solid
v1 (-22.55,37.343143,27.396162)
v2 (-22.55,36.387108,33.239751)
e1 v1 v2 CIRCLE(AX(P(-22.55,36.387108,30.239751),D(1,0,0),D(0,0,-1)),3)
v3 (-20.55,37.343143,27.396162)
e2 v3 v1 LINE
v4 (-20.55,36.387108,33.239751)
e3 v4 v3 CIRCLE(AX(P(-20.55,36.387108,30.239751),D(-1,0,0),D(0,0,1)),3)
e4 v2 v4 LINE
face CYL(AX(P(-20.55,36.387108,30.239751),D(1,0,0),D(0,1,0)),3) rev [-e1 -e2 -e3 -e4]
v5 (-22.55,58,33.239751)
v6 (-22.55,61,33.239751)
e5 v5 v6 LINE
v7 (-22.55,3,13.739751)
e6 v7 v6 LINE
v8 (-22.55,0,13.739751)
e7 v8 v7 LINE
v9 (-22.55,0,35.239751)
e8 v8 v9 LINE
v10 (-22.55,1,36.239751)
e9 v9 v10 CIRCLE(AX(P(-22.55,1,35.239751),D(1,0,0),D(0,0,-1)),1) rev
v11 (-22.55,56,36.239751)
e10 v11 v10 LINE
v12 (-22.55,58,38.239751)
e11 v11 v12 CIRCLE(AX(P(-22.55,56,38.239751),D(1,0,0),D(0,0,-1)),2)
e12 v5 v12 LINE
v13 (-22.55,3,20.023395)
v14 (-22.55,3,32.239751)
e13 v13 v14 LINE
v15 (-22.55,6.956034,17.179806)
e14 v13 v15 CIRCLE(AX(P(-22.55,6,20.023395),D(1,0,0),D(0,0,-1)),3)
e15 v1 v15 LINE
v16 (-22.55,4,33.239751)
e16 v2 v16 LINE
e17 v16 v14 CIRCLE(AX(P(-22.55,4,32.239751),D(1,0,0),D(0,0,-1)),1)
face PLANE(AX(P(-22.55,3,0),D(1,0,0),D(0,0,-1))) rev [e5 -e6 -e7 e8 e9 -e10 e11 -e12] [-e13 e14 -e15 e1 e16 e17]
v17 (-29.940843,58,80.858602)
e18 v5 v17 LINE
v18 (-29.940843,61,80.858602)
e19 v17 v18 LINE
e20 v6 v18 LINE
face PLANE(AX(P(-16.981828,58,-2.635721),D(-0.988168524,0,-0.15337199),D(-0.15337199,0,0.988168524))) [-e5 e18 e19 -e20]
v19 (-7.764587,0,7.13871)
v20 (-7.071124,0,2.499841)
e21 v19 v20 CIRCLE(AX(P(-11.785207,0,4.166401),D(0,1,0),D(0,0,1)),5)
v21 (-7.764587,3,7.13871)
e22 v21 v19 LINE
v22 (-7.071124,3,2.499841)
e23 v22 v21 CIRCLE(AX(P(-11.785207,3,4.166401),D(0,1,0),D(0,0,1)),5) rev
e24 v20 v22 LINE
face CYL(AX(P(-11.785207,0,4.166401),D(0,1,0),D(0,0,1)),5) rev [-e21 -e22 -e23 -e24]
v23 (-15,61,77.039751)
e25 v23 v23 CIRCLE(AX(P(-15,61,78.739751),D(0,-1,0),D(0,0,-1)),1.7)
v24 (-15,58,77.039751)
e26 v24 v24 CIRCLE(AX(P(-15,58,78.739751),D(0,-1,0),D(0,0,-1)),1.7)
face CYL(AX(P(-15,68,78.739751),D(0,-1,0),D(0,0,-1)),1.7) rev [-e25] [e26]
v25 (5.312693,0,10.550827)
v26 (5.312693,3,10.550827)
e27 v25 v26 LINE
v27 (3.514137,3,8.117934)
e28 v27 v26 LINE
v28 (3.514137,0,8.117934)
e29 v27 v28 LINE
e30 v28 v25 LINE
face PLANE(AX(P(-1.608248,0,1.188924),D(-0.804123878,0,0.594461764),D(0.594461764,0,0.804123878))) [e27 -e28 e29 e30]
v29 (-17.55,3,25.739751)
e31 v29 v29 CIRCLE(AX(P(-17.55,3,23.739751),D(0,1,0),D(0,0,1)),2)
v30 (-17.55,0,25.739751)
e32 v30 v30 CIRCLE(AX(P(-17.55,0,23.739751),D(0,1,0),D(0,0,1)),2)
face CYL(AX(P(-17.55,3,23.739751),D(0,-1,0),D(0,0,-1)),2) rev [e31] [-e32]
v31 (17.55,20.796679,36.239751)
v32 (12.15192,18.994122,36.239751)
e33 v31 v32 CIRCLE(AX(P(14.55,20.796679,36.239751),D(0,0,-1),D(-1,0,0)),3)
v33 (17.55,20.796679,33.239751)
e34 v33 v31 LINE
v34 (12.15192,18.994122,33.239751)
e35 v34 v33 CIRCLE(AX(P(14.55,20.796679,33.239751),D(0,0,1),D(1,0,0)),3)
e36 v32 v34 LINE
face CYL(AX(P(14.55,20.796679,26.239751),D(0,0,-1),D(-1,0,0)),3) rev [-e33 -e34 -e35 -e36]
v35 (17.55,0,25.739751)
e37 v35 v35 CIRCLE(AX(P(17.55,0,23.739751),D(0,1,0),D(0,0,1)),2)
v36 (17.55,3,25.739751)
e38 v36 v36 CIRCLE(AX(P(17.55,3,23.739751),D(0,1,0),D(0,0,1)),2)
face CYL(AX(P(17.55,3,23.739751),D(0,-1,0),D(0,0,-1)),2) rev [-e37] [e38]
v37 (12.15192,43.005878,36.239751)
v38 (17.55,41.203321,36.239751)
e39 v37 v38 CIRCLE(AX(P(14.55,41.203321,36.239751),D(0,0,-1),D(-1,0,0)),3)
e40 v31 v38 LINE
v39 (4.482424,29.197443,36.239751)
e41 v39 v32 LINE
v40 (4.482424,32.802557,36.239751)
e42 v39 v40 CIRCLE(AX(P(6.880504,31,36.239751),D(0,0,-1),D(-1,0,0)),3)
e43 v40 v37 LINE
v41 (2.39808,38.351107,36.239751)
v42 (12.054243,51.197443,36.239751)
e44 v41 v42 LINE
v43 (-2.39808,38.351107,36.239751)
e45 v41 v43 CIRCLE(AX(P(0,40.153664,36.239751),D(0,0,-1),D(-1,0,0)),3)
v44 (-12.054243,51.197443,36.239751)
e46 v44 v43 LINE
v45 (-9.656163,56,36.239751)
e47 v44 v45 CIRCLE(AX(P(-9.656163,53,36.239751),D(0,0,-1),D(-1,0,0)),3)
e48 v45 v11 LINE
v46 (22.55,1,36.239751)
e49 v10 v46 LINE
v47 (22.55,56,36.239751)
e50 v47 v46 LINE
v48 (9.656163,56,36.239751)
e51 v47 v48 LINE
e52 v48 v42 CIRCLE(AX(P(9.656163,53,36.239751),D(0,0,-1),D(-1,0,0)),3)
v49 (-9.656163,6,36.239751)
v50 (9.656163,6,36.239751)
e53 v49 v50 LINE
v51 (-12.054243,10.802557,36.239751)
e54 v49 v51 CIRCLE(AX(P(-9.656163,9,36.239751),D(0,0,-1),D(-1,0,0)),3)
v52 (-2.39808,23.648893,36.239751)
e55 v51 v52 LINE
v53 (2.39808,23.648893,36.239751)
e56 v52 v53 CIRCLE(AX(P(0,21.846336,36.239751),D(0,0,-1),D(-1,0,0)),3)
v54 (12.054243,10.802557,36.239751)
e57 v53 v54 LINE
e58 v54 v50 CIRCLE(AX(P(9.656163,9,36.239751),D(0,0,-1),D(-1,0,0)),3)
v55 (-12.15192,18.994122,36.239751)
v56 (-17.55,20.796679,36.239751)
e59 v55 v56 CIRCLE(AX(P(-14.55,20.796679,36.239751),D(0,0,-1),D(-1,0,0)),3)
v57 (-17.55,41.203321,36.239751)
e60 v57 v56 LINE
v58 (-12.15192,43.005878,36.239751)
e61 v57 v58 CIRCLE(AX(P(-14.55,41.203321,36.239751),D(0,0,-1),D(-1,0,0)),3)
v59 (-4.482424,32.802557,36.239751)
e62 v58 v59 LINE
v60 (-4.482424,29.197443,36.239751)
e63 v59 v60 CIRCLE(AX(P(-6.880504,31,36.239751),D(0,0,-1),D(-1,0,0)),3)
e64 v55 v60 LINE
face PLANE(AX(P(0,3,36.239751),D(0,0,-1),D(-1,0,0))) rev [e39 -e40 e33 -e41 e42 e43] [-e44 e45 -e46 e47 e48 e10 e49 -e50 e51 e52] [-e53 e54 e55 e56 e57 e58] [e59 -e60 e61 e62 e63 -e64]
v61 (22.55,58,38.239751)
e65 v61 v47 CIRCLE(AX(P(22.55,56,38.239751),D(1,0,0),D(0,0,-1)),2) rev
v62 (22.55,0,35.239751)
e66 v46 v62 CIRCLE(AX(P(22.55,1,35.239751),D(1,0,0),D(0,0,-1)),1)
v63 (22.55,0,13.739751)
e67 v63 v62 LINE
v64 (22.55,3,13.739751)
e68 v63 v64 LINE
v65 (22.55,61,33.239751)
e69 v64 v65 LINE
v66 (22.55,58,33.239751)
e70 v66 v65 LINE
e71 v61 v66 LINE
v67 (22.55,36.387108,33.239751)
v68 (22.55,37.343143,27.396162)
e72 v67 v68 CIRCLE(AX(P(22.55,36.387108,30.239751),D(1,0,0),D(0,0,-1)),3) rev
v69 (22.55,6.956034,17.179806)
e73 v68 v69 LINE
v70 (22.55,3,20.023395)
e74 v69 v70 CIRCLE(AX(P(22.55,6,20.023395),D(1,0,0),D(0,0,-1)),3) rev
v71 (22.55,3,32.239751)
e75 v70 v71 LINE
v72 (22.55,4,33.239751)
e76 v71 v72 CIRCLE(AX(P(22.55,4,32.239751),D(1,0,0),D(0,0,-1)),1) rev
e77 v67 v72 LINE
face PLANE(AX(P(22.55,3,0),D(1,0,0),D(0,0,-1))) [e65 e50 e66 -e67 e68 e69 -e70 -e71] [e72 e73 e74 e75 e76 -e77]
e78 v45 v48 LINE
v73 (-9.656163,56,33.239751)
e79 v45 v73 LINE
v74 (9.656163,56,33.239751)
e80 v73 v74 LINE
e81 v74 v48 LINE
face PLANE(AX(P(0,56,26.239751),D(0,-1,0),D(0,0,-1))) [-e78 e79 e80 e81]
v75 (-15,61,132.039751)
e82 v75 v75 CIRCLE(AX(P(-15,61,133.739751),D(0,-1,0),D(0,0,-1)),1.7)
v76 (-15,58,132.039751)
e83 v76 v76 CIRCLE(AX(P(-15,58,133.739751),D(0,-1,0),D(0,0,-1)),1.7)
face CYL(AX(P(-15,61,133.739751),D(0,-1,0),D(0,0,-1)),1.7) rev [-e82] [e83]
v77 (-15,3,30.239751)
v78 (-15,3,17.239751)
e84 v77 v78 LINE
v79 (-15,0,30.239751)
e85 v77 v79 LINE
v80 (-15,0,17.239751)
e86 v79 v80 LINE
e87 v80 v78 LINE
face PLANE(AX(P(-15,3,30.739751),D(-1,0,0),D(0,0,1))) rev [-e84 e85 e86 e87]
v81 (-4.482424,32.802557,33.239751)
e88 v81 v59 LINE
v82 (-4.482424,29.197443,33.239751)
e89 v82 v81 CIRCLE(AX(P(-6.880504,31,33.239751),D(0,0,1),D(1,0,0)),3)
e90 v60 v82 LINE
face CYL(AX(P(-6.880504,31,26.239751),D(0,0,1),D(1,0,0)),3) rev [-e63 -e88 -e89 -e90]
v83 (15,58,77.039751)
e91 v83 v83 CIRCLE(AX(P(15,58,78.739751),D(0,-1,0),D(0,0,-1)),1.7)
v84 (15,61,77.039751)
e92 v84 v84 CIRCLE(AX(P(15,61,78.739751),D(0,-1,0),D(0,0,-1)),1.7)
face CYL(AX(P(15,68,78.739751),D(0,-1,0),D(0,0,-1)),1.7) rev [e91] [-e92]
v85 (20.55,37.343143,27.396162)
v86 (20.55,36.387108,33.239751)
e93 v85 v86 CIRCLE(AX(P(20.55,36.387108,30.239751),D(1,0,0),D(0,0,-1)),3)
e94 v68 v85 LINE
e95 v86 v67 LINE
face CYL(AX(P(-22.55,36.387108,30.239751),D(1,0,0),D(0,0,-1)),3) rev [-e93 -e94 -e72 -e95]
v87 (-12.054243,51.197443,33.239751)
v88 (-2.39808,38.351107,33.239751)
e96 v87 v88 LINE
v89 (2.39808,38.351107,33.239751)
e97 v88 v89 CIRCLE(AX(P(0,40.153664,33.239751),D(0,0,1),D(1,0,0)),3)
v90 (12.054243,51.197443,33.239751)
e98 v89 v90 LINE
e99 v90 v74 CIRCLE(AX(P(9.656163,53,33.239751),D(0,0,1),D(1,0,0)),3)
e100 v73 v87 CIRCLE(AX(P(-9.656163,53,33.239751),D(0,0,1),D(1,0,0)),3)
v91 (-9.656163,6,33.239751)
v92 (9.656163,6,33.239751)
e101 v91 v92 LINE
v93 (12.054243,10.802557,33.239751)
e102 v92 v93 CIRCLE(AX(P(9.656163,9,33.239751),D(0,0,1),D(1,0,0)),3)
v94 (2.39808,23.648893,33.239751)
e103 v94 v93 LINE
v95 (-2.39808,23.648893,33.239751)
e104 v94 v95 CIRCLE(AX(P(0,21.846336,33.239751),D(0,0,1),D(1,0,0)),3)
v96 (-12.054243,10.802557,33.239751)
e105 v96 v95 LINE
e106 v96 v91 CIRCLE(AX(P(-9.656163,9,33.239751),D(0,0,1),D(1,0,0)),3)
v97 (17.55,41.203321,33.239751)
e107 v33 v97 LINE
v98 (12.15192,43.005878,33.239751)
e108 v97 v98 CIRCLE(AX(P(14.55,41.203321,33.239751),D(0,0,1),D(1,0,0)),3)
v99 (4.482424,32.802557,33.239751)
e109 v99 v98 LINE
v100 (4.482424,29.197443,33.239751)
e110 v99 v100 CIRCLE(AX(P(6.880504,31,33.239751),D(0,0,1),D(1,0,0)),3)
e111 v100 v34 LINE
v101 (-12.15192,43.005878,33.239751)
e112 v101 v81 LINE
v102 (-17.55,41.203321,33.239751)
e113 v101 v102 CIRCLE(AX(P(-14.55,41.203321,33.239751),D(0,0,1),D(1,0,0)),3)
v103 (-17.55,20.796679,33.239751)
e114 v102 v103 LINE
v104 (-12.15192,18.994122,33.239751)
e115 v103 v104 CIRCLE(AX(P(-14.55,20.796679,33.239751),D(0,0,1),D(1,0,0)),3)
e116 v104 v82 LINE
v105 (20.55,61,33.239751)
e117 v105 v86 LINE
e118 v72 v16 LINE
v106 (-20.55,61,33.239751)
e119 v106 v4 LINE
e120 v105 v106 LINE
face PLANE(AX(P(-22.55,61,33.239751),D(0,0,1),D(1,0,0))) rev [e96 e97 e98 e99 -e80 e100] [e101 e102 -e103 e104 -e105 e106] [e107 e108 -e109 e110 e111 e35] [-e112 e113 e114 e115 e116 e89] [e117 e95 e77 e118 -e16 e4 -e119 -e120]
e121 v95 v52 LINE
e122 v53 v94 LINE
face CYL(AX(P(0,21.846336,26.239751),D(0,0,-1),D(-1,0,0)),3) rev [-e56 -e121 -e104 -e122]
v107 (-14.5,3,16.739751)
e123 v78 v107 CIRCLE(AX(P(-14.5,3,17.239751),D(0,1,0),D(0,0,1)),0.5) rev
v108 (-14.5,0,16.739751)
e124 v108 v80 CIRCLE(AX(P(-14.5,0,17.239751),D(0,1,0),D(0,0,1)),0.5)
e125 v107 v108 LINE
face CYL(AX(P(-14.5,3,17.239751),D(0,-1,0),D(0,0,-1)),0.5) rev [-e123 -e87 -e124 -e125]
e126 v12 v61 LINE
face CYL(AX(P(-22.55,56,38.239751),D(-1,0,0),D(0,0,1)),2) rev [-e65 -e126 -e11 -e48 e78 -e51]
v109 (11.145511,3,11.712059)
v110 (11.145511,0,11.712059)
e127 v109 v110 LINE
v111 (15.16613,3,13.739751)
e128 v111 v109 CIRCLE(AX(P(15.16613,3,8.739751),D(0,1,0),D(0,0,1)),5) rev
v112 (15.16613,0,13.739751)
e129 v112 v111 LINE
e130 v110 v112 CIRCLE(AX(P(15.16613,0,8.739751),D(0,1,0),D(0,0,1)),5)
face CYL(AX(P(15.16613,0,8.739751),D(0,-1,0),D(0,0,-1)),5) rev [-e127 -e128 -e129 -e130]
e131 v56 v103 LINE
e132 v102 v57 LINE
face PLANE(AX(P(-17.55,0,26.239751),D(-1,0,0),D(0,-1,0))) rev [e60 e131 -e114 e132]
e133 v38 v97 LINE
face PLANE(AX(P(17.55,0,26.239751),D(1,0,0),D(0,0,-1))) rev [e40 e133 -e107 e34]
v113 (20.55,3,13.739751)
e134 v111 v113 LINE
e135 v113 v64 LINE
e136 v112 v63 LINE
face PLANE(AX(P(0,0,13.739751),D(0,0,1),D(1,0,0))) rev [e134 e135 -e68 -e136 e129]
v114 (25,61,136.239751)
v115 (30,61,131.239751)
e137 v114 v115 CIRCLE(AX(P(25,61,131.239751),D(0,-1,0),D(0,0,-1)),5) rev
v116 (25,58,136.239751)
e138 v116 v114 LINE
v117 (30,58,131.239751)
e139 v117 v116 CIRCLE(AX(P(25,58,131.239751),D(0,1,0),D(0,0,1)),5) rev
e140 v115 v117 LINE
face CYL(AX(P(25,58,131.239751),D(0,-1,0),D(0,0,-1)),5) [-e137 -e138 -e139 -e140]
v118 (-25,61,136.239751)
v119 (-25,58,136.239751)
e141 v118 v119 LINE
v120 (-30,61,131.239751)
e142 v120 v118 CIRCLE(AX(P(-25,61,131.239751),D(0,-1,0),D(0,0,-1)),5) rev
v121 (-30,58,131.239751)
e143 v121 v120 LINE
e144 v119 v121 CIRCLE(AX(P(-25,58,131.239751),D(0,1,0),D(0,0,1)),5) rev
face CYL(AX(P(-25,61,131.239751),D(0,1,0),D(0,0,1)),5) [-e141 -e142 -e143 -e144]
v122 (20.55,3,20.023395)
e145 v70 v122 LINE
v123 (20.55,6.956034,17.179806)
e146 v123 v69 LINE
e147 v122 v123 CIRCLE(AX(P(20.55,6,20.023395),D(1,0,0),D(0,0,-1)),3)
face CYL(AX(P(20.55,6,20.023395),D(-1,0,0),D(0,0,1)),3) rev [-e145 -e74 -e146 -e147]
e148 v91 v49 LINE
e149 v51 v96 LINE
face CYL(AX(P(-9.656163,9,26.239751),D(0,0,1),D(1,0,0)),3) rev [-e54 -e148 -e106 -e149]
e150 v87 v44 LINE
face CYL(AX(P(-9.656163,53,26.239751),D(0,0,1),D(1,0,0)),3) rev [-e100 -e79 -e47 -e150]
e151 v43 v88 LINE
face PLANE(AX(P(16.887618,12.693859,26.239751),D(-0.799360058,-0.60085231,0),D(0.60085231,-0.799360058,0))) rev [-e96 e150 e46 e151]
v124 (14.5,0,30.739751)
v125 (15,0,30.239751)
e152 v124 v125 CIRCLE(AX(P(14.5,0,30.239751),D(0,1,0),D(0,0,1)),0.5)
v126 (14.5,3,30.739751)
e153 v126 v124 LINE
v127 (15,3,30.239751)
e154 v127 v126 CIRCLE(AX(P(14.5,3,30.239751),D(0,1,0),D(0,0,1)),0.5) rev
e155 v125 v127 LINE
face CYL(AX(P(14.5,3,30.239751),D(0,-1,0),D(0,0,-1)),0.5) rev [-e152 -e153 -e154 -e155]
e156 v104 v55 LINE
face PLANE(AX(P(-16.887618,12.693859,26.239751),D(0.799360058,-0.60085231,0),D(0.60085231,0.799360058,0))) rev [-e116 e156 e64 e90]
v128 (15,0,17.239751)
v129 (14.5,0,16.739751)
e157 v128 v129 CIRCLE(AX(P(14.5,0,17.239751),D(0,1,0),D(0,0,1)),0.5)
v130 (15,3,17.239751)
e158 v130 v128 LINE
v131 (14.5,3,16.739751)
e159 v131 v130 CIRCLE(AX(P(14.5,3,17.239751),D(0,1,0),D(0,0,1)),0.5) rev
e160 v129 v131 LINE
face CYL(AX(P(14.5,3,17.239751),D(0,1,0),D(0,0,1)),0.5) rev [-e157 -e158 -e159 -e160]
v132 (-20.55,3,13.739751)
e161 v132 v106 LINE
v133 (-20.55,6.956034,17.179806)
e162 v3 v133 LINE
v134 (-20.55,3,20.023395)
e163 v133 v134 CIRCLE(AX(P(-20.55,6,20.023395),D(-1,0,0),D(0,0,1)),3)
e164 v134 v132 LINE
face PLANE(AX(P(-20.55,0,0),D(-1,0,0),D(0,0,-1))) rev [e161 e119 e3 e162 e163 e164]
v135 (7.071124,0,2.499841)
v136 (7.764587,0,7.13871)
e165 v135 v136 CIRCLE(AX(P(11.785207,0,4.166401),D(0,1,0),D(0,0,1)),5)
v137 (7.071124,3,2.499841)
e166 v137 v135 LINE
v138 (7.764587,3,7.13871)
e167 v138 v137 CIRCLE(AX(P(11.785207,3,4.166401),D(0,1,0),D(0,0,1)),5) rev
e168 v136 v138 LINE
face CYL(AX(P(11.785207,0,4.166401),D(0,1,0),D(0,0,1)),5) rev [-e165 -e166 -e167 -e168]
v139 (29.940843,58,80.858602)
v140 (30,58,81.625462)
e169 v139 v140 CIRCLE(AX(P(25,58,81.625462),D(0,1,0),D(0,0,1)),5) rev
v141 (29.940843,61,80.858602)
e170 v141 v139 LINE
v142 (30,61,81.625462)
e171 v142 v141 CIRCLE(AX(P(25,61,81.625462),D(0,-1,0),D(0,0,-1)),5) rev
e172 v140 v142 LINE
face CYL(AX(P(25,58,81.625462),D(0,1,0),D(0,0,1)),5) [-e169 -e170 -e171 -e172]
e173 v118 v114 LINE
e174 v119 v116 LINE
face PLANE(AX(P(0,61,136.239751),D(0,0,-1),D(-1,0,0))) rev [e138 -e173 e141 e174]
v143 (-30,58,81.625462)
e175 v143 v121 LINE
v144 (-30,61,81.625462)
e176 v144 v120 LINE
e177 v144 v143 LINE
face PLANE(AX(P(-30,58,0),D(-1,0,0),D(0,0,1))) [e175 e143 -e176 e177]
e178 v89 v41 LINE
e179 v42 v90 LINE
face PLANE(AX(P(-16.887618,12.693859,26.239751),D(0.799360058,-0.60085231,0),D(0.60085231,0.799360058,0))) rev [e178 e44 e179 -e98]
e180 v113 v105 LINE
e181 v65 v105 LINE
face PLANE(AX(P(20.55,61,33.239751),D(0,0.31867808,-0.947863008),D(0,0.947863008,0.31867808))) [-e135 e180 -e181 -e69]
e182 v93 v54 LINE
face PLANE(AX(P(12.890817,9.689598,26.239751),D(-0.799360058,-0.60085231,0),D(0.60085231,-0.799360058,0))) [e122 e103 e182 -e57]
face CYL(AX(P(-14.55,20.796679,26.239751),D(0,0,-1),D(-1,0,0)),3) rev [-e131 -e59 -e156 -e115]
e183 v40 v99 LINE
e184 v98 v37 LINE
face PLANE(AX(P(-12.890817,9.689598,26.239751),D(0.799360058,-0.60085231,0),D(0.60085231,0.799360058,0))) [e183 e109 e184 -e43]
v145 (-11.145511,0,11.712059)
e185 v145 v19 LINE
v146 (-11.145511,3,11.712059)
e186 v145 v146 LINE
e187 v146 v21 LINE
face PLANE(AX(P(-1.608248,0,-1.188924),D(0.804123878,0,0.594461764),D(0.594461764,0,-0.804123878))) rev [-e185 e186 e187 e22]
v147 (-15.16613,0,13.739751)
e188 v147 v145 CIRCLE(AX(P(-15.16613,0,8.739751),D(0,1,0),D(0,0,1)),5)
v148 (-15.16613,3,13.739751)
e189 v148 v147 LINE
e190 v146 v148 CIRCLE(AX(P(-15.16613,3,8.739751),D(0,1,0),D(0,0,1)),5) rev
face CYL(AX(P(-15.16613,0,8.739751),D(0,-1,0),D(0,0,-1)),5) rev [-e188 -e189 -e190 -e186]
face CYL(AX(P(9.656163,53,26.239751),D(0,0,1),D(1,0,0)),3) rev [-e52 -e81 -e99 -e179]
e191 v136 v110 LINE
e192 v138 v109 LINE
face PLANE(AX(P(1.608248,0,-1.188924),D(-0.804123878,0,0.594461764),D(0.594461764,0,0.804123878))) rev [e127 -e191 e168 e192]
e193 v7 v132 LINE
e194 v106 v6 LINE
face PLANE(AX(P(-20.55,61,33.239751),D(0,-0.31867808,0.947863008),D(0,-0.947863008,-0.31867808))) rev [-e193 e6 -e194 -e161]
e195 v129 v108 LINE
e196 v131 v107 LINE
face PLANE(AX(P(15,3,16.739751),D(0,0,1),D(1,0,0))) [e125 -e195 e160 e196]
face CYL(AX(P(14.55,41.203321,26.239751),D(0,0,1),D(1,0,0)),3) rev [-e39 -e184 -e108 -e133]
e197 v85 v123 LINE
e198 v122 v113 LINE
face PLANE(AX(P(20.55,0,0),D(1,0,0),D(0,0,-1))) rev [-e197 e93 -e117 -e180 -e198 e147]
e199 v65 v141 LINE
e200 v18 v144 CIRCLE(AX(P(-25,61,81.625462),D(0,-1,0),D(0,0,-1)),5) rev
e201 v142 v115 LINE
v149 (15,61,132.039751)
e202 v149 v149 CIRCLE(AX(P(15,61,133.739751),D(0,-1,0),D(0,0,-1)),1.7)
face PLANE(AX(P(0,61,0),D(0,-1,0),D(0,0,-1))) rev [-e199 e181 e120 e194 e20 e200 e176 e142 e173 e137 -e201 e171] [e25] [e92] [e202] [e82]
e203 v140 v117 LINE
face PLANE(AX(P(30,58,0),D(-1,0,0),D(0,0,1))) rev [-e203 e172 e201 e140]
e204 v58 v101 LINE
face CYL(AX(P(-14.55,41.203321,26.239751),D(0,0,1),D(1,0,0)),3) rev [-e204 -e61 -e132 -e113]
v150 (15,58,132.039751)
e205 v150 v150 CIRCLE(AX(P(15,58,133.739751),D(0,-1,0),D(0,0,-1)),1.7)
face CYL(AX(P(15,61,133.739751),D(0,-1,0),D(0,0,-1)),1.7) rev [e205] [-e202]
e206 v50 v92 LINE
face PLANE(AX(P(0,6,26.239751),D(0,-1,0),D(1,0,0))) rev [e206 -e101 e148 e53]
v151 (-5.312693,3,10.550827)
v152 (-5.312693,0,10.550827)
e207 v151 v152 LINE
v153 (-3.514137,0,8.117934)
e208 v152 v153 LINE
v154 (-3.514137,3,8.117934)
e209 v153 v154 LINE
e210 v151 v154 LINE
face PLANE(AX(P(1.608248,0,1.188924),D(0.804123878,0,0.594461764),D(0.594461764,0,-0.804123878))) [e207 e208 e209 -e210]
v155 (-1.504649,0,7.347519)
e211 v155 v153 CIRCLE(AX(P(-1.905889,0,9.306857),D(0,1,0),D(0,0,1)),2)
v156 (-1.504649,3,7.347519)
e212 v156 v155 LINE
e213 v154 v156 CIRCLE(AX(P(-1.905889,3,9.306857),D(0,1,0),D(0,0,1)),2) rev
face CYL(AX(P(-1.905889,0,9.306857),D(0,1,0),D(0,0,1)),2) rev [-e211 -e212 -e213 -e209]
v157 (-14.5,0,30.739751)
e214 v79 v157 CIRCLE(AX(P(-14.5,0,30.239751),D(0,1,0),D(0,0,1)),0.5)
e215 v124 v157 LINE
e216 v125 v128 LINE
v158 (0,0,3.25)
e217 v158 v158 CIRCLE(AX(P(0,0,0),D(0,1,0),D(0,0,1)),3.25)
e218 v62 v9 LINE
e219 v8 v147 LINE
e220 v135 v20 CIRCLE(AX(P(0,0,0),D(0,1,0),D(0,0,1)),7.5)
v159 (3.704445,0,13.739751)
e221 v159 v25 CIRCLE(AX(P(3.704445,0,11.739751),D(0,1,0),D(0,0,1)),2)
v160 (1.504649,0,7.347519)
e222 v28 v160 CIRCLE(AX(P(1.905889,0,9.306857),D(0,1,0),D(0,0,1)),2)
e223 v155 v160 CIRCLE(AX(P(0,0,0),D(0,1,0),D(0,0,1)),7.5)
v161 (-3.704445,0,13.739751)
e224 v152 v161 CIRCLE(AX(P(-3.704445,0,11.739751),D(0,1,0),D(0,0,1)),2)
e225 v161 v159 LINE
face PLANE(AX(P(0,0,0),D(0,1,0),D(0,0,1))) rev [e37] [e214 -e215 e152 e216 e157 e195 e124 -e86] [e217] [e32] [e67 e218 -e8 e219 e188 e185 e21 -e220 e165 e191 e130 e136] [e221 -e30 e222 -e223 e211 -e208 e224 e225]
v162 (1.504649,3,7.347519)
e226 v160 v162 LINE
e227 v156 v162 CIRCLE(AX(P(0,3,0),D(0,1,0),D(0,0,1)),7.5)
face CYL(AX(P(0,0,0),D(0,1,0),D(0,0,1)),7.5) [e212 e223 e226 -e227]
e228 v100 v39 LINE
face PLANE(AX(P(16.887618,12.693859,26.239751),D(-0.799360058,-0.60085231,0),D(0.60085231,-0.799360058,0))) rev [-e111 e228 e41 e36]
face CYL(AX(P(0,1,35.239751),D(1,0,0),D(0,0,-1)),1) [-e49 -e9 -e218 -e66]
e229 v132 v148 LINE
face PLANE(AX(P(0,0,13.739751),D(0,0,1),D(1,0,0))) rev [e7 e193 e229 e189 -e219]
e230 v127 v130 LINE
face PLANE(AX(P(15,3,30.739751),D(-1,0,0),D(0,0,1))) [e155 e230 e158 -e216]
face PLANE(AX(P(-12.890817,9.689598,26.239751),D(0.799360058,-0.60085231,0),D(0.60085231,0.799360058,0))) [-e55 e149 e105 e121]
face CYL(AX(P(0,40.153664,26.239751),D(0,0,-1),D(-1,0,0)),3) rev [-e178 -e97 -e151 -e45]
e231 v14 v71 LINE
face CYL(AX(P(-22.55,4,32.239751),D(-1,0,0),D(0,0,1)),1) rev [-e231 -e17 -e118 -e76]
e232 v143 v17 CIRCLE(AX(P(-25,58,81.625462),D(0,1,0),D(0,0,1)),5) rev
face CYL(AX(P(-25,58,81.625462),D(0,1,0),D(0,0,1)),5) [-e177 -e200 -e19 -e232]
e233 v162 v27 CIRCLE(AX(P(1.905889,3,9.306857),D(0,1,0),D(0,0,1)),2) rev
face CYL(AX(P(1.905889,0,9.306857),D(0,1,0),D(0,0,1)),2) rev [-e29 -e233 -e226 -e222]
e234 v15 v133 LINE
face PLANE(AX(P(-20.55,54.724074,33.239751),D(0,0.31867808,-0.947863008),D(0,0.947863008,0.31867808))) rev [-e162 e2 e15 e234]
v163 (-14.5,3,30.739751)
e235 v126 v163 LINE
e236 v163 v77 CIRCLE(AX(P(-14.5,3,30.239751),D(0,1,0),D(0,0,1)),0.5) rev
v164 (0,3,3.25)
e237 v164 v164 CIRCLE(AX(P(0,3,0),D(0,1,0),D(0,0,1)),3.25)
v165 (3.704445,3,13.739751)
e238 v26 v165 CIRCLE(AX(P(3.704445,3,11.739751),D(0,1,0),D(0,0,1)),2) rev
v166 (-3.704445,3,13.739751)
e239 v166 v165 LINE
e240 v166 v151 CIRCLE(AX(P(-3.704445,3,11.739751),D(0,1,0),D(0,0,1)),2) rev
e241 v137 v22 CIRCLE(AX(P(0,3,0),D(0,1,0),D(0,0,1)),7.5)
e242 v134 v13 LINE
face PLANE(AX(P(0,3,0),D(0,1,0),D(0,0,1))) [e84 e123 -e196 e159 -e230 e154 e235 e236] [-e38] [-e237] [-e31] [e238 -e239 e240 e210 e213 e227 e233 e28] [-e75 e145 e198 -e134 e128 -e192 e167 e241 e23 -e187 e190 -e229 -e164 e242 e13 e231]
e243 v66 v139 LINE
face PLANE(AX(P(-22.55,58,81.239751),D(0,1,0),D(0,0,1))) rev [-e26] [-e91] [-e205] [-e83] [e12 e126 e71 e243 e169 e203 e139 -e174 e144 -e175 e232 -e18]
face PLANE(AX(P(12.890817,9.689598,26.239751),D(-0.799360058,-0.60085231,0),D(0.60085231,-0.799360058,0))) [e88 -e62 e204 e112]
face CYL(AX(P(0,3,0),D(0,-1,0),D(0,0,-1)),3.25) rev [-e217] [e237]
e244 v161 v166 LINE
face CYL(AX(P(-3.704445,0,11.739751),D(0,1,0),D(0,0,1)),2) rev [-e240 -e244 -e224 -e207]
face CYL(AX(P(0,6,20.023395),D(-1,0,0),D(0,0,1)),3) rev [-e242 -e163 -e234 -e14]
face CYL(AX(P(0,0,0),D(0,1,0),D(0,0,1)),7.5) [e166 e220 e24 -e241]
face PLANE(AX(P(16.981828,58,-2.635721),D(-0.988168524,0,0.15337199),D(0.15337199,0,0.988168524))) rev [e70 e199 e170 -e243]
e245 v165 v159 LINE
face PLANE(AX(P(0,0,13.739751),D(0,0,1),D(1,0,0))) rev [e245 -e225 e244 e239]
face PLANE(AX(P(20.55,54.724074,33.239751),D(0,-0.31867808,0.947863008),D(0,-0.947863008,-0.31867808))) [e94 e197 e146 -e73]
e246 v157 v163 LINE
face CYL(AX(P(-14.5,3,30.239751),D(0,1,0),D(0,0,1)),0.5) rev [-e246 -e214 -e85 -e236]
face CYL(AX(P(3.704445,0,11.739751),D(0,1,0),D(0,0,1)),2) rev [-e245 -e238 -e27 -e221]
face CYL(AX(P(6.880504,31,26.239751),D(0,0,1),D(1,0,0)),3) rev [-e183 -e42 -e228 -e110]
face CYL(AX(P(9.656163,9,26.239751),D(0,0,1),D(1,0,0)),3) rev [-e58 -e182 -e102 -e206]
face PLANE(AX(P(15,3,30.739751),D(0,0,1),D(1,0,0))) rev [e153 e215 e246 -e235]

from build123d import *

# Parameters (mm, degrees)
SKETCH1_R           = 2
SKETCH1_W           = 30
SKETCH1_H           = 14
BOSS_EXTRUDE1_DEPTH = 3
CUT_EXTRUDE1_DEPTH  = 3
FILLET1_R           = 5
FILLET2_R           = 2
SKETCH3_W           = 45.1
SKETCH3_H           = 3
BOSS_EXTRUDE2_DEPTH = 58
FILLET3_R           = 0.5
FILLET4_R           = 1
CUT_EXTRUDE2_DEPTH  = 10
FILLET5_R           = 3
BOSS_EXTRUDE3_DEPTH = 2
FILLET6_R           = 3
SKETCH6_W           = 45.1
SKETCH6_H           = 3
BOSS_EXTRUDE4_DEPTH = 45
FILLET8_R           = 2
SKETCH7_R           = 1.7
CUT_EXTRUDE3_DEPTH  = 10
BOSS_EXTRUDE5_DEPTH = 3
SKETCH10_R          = 1.7
BOSS_EXTRUDE6_DEPTH = 3
FILLET12_R          = 5


with BuildPart() as part:
    # Sketch1 → Boss-Extrude1 (new body)
    with BuildSketch(Plane(origin=(0, 0, 0), x_dir=(1, 0, 0), z_dir=(0, 1, 0))):
        Polygon((0, 10), (-22.55, 10), (-22.55, -36.239750654), (22.55, -36.239750654), (22.55, 10), align=None)
        with Locations(Location((-17.55, -23.739750654, 0), (0, 0, 270))):
            Circle(SKETCH1_R, mode=Mode.SUBTRACT)
        with Locations((0, -23.739750654)):
            Rectangle(SKETCH1_W, SKETCH1_H, mode=Mode.SUBTRACT)
        with BuildLine():
            ThreePointArc((-3.218514532, -0.451291712), (-2.452467947, 2.132580824), (0, 3.25))
            ThreePointArc((0, 3.25), (2.132580824, 2.452467947), (3.218514532, 0.451291712))
            ThreePointArc((3.218514532, 0.451291712), (2.452467947, -2.132580824), (0, -3.25))
            ThreePointArc((0, -3.25), (-2.132580824, -2.452467947), (-3.218514532, -0.451291712))
        make_face(mode=Mode.SUBTRACT)
        with Locations(Location((17.55, -23.739750654, 0), (0, 0, 270))):
            Circle(SKETCH1_R, mode=Mode.SUBTRACT)
    extrude(amount=BOSS_EXTRUDE1_DEPTH)

    # Sketch2 → Cut-Extrude1 (cut)
    with BuildSketch(Plane(origin=(0, 3, 0), x_dir=(1, 0, 0), z_dir=(0, 1, 0))):
        with BuildLine():
            Line((-22.55, 10), (-22.55, -13.739750654))
            Line((-22.55, -13.739750654), (-12.644514973, -13.739750654))
            Line((-12.644514973, -13.739750654), (-5.905264771, -4.623618495))
            ThreePointArc((-5.905264771, -4.623618495), (-2.445456421, 7.090115859), (7.5, 0))
            ThreePointArc((7.5, 0), (7.090115859, -2.445456421), (5.905264771, -4.623618495))
            Line((5.905264771, -4.623618495), (12.644514973, -13.739750654))
            Line((12.644514973, -13.739750654), (22.55, -13.739750654))
            Line((22.55, -13.739750654), (22.55, 10))
            Line((22.55, 10), (-22.55, 10))
        make_face()
        with BuildLine():
            Line((-7.670157029, -13.739750654), (7.670157029, -13.739750654))
            Line((7.670157029, -13.739750654), (2.68876926, -7.001465551))
            ThreePointArc((2.68876926, -7.001465551), (0, -7.5), (-2.68876926, -7.001465551))
            Line((-2.68876926, -7.001465551), (-7.670157029, -13.739750654))
        make_face()
    extrude(amount=-CUT_EXTRUDE1_DEPTH, mode=Mode.SUBTRACT)

    # Fillet1
    fillet1_edges = [part.edges().sort_by_distance(p)[0] for p in [
        (5.905264771, 1.5, 4.623618495),
        (-5.905264771, 1.5, 4.623618495),
        (-12.644514973, 1.5, 13.739750654),
        (12.644514973, 1.5, 13.739750654),
    ]]
    fillet(fillet1_edges, radius=FILLET1_R)

    # Fillet2
    fillet2_edges = [part.edges().sort_by_distance(p)[0] for p in [
        (-2.68876926, 1.5, 7.001465551),
        (2.68876926, 1.5, 7.001465551),
        (7.670157029, 1.5, 13.739750654),
        (-7.670157029, 1.5, 13.739750654),
    ]]
    fillet(fillet2_edges, radius=FILLET2_R)

    # Sketch3 → Boss-Extrude2 (add)
    with BuildSketch(Plane(origin=(0, 3, 0), x_dir=(1, 0, 0), z_dir=(0, 1, 0))):
        with Locations((0, -34.739750654)):
            Rectangle(SKETCH3_W, SKETCH3_H)
    extrude(amount=BOSS_EXTRUDE2_DEPTH)

    # Fillet3
    fillet3_edges = [part.edges().sort_by_distance(p)[0] for p in [
        (15, 1.5, 16.739750654),
        (-15, 1.5, 16.739750654),
        (-15, 1.5, 30.739750654),
        (15, 1.5, 30.739750654),
    ]]
    fillet(fillet3_edges, radius=FILLET3_R)

    # Fillet4
    fillet4_edges = [part.edges().sort_by_distance(p)[0] for p in [
        (0, 3, 33.239750654),
        (0, 0, 36.239750654),
    ]]
    fillet(fillet4_edges, radius=FILLET4_R)

    # Sketch4 → Cut-Extrude2 (cut)
    with BuildSketch(Plane.XY.offset(36.239750654)):
        Polygon((-3.127501776, 31), (-17.55, 50.187359056), (-17.55, 11.812640944), align=None)
        Polygon((15.66416489, 56), (-15.66416489, 56), (0, 35.160756243), align=None)
        Polygon((17.55, 11.812640944), (17.55, 50.187359056), (3.127501776, 31), align=None)
        Polygon((15.66416489, 6), (0, 26.839243757), (-15.66416489, 6), align=None)
    extrude(amount=-CUT_EXTRUDE2_DEPTH, mode=Mode.SUBTRACT)

    # Fillet5
    fillet5_edges = [part.edges().sort_by_distance(p)[0] for p in [
        (3.127501776, 31, 34.739750654),
        (17.55, 50.187359056, 34.739750654),
        (17.55, 11.812640944, 34.739750654),
        (-15.66416489, 56, 34.739750654),
        (15.66416489, 56, 34.739750654),
        (0, 35.160756243, 34.739750654),
        (0, 26.839243757, 34.739750654),
        (15.66416489, 6, 34.739750654),
        (-15.66416489, 6, 34.739750654),
        (-17.55, 50.187359056, 34.739750654),
        (-3.127501776, 31, 34.739750654),
        (-17.55, 11.812640944, 34.739750654),
    ]]
    fillet(fillet5_edges, radius=FILLET5_R)

    # Sketch5 → Boss-Extrude3 (add)
    with BuildSketch(Plane(origin=(22.55, 0, 0), x_dir=(0, 0, -1), z_dir=(1, 0, 0))):
        Polygon((-33.239750654, 61), (-13.739750654, 3), (-15.849760206, 3), (-33.239750654, 54.724074153), align=None)
    boss_extrude3 = extrude(amount=-BOSS_EXTRUDE3_DEPTH)

    # Mirror1: Boss-Extrude3 across plane
    add(boss_extrude3.mirror(Plane.ZY))

    # Fillet6
    fillet6_edges = [part.edges().sort_by_distance(p)[0] for p in [
        (21.55, 54.724074153, 33.239750654),
        (21.55, 3, 15.849760206),
        (-21.55, 54.724074153, 33.239750654),
        (-21.55, 3, 15.849760206),
    ]]
    fillet(fillet6_edges, radius=FILLET6_R)

    # Sketch6 → Boss-Extrude4 (add)
    with BuildSketch(Plane.XY.offset(36.239750654)):
        with Locations((0, 59.5)):
            Rectangle(SKETCH6_W, SKETCH6_H)
    extrude(amount=BOSS_EXTRUDE4_DEPTH)

    # Fillet8
    fillet8_edges = [part.edges().sort_by_distance(p)[0] for p in [
        (0, 58, 36.239750654),
    ]]
    fillet(fillet8_edges, radius=FILLET8_R - 0.0001)  # a hair under: the kernel refuses the full size

    # Sketch7 → Cut-Extrude3 (cut)
    with BuildSketch(Plane.XZ.offset(-58)):
        with Locations(Location((-15, 78.739750654, 0), (0, 0, 270))):
            Circle(SKETCH7_R)
        with Locations(Location((15, 78.739750654, 0), (0, 0, 270))):
            Circle(SKETCH7_R)
    extrude(amount=-CUT_EXTRUDE3_DEPTH, mode=Mode.SUBTRACT)

    # Sketch9 → Boss-Extrude5 (add)
    with BuildSketch(Plane(origin=(0, 61, 0), x_dir=(1, 0, 0), z_dir=(0, 1, 0))):
        Polygon((-22.55, -81.239750654), (-22.55, -33.239750654), (-30, -81.239750654), align=None)
        Polygon((-22.55, -81.239750654), (-30, -81.239750654), (-30, -131.239750654), (0, -131.239750654), (0, -81.239750654), align=None)
        Polygon((22.55, -81.239750654), (0, -81.239750654), (0, -131.239750654), (30, -131.239750654), (30, -81.239750654), align=None)
        Polygon((22.55, -33.239750654), (22.55, -81.239750654), (30, -81.239750654), align=None)
    extrude(amount=-BOSS_EXTRUDE5_DEPTH)

    # Sketch10 → Boss-Extrude6 (add)
    with BuildSketch(Plane.XZ.offset(-58)):
        Polygon((-30, 136.239750654), (-30, 131.239750654), (30, 131.239750654), (30, 136.239750654), (10.586303141, 136.239750654), (7.586303141, 136.239750654), (-21.497160634, 136.239750654), (-24.497160634, 136.239750654), align=None)
        with Locations(Location((-15, 133.739750654, 0), (0, 0, 270))):
            Circle(SKETCH10_R, mode=Mode.SUBTRACT)
        with BuildLine():
            ThreePointArc((16.7, 133.739750654), (15, 132.039750654), (13.3, 133.739750654))
            ThreePointArc((13.3, 133.739750654), (15, 135.439750654), (16.7, 133.739750654))
        make_face(mode=Mode.SUBTRACT)
    extrude(amount=-BOSS_EXTRUDE6_DEPTH)

    # Fillet12
    fillet12_edges = [part.edges().sort_by_distance(p)[0] for p in [
        (-30, 59.5, 81.239750654),
        (30, 59.5, 81.239750654),
        (-30, 59.5, 136.239750654),
        (30, 59.5, 136.239750654),
    ]]
    fillet(fillet12_edges, radius=FILLET12_R)


solid = part.part
